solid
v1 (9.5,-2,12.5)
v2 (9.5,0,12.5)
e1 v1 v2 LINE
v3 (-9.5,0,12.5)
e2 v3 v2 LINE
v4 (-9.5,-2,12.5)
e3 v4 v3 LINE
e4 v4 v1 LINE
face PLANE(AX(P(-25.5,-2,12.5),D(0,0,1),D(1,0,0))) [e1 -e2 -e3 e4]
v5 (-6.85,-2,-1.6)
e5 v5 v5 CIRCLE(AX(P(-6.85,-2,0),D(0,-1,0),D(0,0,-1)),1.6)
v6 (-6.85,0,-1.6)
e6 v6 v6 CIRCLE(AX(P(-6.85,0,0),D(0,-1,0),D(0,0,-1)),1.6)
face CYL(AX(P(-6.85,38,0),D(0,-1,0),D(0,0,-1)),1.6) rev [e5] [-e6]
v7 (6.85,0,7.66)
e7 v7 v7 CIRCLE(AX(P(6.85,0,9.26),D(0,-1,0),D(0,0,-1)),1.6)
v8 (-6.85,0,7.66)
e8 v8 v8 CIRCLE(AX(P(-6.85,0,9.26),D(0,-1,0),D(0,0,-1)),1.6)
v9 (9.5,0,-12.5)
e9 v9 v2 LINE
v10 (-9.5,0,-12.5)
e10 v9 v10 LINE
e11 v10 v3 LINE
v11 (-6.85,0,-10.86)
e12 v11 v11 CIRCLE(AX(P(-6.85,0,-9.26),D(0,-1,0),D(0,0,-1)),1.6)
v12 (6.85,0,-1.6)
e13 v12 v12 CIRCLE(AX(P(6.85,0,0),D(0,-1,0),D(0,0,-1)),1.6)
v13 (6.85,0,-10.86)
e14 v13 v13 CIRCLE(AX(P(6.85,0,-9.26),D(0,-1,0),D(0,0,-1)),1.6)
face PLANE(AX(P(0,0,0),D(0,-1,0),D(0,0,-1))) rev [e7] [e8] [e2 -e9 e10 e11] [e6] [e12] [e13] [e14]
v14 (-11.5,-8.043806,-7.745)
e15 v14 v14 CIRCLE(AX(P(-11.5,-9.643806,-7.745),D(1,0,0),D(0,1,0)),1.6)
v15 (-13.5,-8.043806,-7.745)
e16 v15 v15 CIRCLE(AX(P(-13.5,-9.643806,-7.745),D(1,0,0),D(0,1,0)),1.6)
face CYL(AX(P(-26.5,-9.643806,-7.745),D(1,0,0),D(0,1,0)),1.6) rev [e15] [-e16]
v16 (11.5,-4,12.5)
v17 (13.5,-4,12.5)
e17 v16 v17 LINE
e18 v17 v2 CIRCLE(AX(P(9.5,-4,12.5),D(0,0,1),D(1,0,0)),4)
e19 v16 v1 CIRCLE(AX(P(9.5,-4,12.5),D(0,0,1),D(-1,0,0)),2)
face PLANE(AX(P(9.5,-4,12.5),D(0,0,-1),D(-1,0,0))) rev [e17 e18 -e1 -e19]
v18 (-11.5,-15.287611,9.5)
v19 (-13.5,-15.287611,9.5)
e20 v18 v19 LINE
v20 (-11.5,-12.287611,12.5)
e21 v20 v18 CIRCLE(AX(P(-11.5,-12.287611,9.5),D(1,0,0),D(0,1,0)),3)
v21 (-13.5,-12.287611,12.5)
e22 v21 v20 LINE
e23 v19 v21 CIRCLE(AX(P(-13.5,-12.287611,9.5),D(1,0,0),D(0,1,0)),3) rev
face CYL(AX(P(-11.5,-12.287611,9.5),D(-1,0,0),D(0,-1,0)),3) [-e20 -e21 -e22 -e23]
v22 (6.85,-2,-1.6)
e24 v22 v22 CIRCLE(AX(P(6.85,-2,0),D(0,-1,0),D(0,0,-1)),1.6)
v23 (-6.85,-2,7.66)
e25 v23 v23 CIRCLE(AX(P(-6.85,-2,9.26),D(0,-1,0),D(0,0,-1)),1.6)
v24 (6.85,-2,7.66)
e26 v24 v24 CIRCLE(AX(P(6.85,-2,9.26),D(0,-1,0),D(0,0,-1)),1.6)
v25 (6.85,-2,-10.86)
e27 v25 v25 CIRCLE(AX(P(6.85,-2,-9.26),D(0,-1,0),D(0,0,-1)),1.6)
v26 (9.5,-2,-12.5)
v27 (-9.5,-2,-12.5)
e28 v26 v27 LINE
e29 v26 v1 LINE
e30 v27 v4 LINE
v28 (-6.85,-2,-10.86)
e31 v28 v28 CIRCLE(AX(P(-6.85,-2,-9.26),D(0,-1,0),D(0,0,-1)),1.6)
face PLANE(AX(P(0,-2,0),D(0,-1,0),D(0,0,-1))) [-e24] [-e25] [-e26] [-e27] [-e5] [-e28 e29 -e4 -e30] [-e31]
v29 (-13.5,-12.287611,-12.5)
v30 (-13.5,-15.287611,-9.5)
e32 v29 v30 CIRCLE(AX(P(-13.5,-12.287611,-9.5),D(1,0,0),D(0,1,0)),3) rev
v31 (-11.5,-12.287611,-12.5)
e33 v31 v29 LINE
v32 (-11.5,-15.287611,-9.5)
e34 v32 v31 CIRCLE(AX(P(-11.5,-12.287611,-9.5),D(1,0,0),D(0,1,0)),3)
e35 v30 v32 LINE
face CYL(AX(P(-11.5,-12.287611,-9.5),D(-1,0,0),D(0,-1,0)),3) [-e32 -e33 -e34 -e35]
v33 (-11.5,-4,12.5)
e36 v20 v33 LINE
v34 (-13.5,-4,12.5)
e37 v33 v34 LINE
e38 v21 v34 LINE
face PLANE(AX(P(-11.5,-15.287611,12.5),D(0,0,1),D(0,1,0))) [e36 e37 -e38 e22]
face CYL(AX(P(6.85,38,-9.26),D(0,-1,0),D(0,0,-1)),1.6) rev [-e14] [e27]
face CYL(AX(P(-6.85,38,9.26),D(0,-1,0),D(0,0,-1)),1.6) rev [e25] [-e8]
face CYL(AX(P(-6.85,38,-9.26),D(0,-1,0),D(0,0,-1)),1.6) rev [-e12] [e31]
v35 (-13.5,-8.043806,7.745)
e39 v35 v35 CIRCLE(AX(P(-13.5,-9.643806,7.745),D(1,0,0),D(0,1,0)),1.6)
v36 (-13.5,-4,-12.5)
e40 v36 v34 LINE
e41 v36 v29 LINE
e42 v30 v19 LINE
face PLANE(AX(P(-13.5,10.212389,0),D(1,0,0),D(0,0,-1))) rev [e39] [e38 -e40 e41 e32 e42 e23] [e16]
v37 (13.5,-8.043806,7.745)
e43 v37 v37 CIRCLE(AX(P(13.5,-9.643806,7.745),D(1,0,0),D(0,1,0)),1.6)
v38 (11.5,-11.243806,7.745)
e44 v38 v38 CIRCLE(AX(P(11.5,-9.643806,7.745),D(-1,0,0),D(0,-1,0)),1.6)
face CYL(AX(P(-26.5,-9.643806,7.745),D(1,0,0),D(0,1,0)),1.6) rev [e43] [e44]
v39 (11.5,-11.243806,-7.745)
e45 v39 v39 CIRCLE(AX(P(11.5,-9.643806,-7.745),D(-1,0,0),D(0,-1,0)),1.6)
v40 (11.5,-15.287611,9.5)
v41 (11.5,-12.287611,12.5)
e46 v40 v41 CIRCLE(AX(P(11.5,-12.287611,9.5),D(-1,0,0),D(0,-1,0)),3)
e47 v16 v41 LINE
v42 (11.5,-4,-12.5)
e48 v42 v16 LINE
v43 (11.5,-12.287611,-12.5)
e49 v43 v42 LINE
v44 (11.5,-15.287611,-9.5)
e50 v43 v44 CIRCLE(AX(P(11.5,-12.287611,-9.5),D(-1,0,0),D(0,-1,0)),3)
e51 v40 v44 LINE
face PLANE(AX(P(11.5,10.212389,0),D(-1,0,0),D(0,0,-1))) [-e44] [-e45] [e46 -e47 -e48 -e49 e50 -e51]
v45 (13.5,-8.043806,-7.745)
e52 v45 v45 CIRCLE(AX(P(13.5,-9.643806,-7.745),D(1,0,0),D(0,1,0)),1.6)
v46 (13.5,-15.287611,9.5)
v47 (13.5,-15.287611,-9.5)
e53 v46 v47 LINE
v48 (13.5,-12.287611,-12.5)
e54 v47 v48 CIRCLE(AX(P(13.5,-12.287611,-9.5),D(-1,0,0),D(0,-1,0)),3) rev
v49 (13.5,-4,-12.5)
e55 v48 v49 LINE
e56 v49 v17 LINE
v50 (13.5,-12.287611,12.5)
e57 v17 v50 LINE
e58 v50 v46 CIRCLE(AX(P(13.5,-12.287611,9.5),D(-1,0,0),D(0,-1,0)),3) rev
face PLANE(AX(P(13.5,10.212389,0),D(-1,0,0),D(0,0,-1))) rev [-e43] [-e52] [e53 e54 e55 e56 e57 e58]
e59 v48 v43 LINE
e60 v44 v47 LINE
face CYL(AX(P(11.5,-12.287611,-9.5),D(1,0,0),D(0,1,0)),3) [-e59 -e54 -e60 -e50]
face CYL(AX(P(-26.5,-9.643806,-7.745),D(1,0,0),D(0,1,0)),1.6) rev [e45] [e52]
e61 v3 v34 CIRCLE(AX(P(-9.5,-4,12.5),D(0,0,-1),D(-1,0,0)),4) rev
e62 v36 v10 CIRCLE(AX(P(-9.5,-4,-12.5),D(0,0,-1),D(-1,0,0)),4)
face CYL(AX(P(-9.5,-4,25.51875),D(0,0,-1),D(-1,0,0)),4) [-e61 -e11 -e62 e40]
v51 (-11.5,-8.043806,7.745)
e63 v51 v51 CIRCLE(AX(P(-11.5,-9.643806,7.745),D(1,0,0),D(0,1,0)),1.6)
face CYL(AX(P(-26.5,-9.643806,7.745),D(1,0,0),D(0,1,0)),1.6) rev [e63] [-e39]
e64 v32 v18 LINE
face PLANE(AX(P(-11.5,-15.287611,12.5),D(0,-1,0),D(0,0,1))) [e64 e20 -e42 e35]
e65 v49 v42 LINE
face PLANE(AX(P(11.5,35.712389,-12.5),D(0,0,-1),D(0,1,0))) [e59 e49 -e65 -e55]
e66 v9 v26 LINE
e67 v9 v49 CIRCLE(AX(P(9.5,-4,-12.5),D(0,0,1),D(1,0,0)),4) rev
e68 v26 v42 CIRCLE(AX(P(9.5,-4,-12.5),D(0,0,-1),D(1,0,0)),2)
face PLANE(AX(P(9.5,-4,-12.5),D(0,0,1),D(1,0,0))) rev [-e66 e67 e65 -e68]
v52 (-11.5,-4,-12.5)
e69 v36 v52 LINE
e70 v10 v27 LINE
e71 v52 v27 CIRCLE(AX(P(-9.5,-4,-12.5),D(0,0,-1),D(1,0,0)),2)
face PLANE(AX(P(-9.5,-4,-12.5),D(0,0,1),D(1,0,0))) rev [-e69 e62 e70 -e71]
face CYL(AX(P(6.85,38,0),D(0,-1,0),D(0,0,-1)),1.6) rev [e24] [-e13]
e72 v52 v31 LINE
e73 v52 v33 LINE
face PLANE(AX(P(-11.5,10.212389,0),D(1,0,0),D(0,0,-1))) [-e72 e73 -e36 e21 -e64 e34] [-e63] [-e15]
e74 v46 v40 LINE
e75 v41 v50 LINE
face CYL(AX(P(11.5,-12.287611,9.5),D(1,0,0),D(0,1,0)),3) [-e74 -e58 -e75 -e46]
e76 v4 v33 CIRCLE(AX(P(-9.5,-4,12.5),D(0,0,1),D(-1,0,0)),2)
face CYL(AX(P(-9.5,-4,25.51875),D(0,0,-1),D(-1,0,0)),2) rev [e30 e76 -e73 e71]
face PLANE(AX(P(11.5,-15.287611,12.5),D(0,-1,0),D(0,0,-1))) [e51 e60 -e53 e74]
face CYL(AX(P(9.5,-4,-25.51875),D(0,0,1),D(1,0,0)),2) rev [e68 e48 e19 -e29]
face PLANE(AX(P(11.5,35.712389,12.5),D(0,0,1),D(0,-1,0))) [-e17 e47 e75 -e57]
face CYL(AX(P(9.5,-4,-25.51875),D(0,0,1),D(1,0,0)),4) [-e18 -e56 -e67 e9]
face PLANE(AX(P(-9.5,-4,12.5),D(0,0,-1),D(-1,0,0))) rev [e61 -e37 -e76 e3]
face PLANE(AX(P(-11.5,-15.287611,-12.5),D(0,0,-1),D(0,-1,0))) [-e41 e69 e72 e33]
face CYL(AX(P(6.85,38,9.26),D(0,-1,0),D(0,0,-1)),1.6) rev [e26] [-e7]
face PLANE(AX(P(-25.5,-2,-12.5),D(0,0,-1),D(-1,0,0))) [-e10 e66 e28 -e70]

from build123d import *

# Parameters (mm, degrees)
SKETCH_1_W             = 51
SKETCH_1_H             = 25
SM_BASE_FLANGE_3_DEPTH = 2
OTHER_START            = -12.5
OTHER_3_DEPTH          = 25
OTHER_3_2_DEPTH        = 25
OTHER_4_DEPTH          = 25
OTHER_4_2_DEPTH        = 25
SKETCH_20_R            = 1.6
CUT_EXTRUDE_1_DEPTH    = 40
CUT_EXTRUDE_2_DEPTH    = 40
FILLET_1_R             = 3


# Read off the part's stored shape, not the designer's step: 绘制的折弯3, 绘制的折弯4
# Sheet-metal steps are written as plain solids
with BuildPart() as part:
    # 草图1 → 基体-法兰3 (new body)
    with BuildSketch(Plane(origin=(0, 0, 0), x_dir=(1, 0, 0), z_dir=(0, 1, 0))):
        Rectangle(SKETCH_1_W, SKETCH_1_H)
    extrude(amount=-SM_BASE_FLANGE_3_DEPTH)

    # Other 3 outline → Other 3 (cut)
    with BuildSketch(Plane.XY.offset(OTHER_START)):
        with BuildLine():
            Line((-25.5, -2), (-12.964101616, -2))
            ThreePointArc((-12.964101616, -2), (-11.5, -0.535898385), (-9.5, 0))
            Line((-9.5, 0), (-25.5, 0))
            Line((-25.5, 0), (-25.5, -2))
        make_face()
    extrude(amount=OTHER_3_DEPTH, mode=Mode.SUBTRACT)

    # Other 3 2 outline → Other 3 2 (add)
    with BuildSketch(Plane.XY.offset(OTHER_START)):
        with BuildLine():
            Line((-13.5, -15.28761102), (-11.5, -15.28761102))
            Line((-11.5, -15.28761102), (-11.5, -4))
            ThreePointArc((-11.5, -4), (-10.914213562, -2.585786438), (-9.5, -2))
            Line((-9.5, -2), (-12.964101616, -2))
            ThreePointArc((-12.964101616, -2), (-13.363703305, -2.96472382), (-13.5, -4))
            Line((-13.5, -4), (-13.5, -15.28761102))
        make_face()
    extrude(amount=OTHER_3_2_DEPTH)

    # Other 4 outline → Other 4 (cut)
    with BuildSketch(Plane.XY.offset(OTHER_START)):
        with BuildLine():
            ThreePointArc((9.5, 0), (11.5, -0.535898385), (12.964101616, -2))
            Line((12.964101616, -2), (25.5, -2))
            Line((25.5, -2), (25.5, 0))
            Line((25.5, 0), (9.5, 0))
        make_face()
    extrude(amount=OTHER_4_DEPTH, mode=Mode.SUBTRACT)

    # Other 4 2 outline → Other 4 2 (add)
    with BuildSketch(Plane.XY.offset(OTHER_START)):
        with BuildLine():
            Line((11.5, -4), (11.5, -15.28761102))
            Line((11.5, -15.28761102), (13.5, -15.28761102))
            Line((13.5, -15.28761102), (13.5, -4))
            ThreePointArc((13.5, -4), (13.363703305, -2.96472382), (12.964101616, -2))
            Line((12.964101616, -2), (9.5, -2))
            ThreePointArc((9.5, -2), (10.914213562, -2.585786438), (11.5, -4))
        make_face()
    extrude(amount=OTHER_4_2_DEPTH)

    # 草图20 → 切除-拉伸1 (cut)
    with BuildSketch(Plane(origin=(13.5, 0, 0), x_dir=(0, 0, -1), z_dir=(1, 0, 0))):
        with BuildLine():
            Line((-9.345, -9.64380551), (-7.745, -9.64380551))
            Line((-7.745, -9.64380551), (-6.145, -9.64380551))
            ThreePointArc((-6.145, -9.64380551), (-7.745, -8.04380551), (-9.345, -9.64380551))
        make_face()
        with BuildLine():
            Line((-6.145, -9.64380551), (-7.745, -9.64380551))
            Line((-7.745, -9.64380551), (-9.345, -9.64380551))
            ThreePointArc((-9.345, -9.64380551), (-7.745, -11.24380551), (-6.145, -9.64380551))
        make_face()
        with Locations(Location((7.745, -9.64380551, 0), (0, 0, 90))):
            Circle(SKETCH_20_R)
    extrude(amount=-CUT_EXTRUDE_1_DEPTH, mode=Mode.SUBTRACT)

    # 草图21 → 切除-拉伸2 (cut)
    with BuildSketch(Plane.XZ.offset(2)):
        with BuildLine():
            ThreePointArc((-5.25, 9.26), (-5.71862915, 10.39137085), (-6.85, 10.86))
            Line((-6.85, 10.86), (-6.85, 9.26))
            Line((-6.85, 9.26), (-5.25, 9.26))
        make_face()
        with BuildLine():
            Line((-5.25, 9.26), (-6.85, 9.26))
            Line((-6.85, 9.26), (-6.85, 7.66))
            ThreePointArc((-6.85, 7.66), (-5.71862915, 8.12862915), (-5.25, 9.26))
        make_face()
        with BuildLine():
            Line((-6.85, 9.26), (-6.85, 10.86))
            ThreePointArc((-6.85, 10.86), (-8.45, 9.26), (-6.85, 7.66))
            Line((-6.85, 7.66), (-6.85, 9.26))
        make_face()
        with BuildLine():
            Line((6.85, 9.26), (6.85, 10.86))
            ThreePointArc((6.85, 10.86), (5.71862915, 10.39137085), (5.25, 9.26))
            Line((5.25, 9.26), (6.85, 9.26))
        make_face()
        with BuildLine():
            Line((6.85, 7.66), (6.85, 9.26))
            Line((6.85, 9.26), (5.25, 9.26))
            ThreePointArc((5.25, 9.26), (5.71862915, 8.12862915), (6.85, 7.66))
        make_face()
        with BuildLine():
            ThreePointArc((8.45, 9.26), (7.98137085, 10.39137085), (6.85, 10.86))
            Line((6.85, 10.86), (6.85, 9.26))
            Line((6.85, 9.26), (6.85, 7.66))
            ThreePointArc((6.85, 7.66), (7.98137085, 8.12862915), (8.45, 9.26))
        make_face()
        with BuildLine():
            ThreePointArc((8.45, 0), (7.98137085, 1.13137085), (6.85, 1.6))
            Line((6.85, 1.6), (6.85, 0))
            Line((6.85, 0), (6.85, -1.6))
            ThreePointArc((6.85, -1.6), (7.98137085, -1.13137085), (8.45, 0))
        make_face()
        with BuildLine():
            Line((6.85, 0), (6.85, 1.6))
            ThreePointArc((6.85, 1.6), (5.25, 0), (6.85, -1.6))
            Line((6.85, -1.6), (6.85, 0))
        make_face()
        with BuildLine():
            ThreePointArc((-5.25, 0), (-5.71862915, 1.13137085), (-6.85, 1.6))
            Line((-6.85, 1.6), (-6.85, -1.6))
            ThreePointArc((-6.85, -1.6), (-5.71862915, -1.13137085), (-5.25, 0))
        make_face()
        with BuildLine():
            Line((-6.85, -1.6), (-6.85, 1.6))
            ThreePointArc((-6.85, 1.6), (-8.45, 0), (-6.85, -1.6))
        make_face()
        with BuildLine():
            ThreePointArc((-5.25, -9.26), (-5.71862915, -8.12862915), (-6.85, -7.66))
            Line((-6.85, -7.66), (-6.85, -9.26))
            Line((-6.85, -9.26), (-5.25, -9.26))
        make_face()
        with BuildLine():
            Line((-5.25, -9.26), (-6.85, -9.26))
            Line((-6.85, -9.26), (-6.85, -10.86))
            ThreePointArc((-6.85, -10.86), (-5.71862915, -10.39137085), (-5.25, -9.26))
        make_face()
        with BuildLine():
            Line((-6.85, -9.26), (-6.85, -7.66))
            ThreePointArc((-6.85, -7.66), (-8.45, -9.26), (-6.85, -10.86))
            Line((-6.85, -10.86), (-6.85, -9.26))
        make_face()
        with BuildLine():
            ThreePointArc((8.45, -9.26), (7.98137085, -8.12862915), (6.85, -7.66))
            Line((6.85, -7.66), (6.85, -9.26))
            Line((6.85, -9.26), (6.85, -10.86))
            ThreePointArc((6.85, -10.86), (7.98137085, -10.39137085), (8.45, -9.26))
        make_face()
        with BuildLine():
            Line((6.85, -9.26), (6.85, -7.66))
            ThreePointArc((6.85, -7.66), (5.71862915, -8.12862915), (5.25, -9.26))
            Line((5.25, -9.26), (6.85, -9.26))
        make_face()
        with BuildLine():
            Line((6.85, -10.86), (6.85, -9.26))
            Line((6.85, -9.26), (5.25, -9.26))
            ThreePointArc((5.25, -9.26), (5.71862915, -10.39137085), (6.85, -10.86))
        make_face()
    extrude(amount=-CUT_EXTRUDE_2_DEPTH, mode=Mode.SUBTRACT)

    # 圆角1
    fillet_1_edges = [part.edges().sort_by_distance(p)[0] for p in [
        (-12.5, -15.28761102, 12.5),
        (-12.5, -15.28761102, -12.5),
        (12.5, -15.28761102, -12.5),
        (12.5, -15.28761102, 12.5),
    ]]
    fillet(fillet_1_edges, radius=FILLET_1_R)


solid = part.part
